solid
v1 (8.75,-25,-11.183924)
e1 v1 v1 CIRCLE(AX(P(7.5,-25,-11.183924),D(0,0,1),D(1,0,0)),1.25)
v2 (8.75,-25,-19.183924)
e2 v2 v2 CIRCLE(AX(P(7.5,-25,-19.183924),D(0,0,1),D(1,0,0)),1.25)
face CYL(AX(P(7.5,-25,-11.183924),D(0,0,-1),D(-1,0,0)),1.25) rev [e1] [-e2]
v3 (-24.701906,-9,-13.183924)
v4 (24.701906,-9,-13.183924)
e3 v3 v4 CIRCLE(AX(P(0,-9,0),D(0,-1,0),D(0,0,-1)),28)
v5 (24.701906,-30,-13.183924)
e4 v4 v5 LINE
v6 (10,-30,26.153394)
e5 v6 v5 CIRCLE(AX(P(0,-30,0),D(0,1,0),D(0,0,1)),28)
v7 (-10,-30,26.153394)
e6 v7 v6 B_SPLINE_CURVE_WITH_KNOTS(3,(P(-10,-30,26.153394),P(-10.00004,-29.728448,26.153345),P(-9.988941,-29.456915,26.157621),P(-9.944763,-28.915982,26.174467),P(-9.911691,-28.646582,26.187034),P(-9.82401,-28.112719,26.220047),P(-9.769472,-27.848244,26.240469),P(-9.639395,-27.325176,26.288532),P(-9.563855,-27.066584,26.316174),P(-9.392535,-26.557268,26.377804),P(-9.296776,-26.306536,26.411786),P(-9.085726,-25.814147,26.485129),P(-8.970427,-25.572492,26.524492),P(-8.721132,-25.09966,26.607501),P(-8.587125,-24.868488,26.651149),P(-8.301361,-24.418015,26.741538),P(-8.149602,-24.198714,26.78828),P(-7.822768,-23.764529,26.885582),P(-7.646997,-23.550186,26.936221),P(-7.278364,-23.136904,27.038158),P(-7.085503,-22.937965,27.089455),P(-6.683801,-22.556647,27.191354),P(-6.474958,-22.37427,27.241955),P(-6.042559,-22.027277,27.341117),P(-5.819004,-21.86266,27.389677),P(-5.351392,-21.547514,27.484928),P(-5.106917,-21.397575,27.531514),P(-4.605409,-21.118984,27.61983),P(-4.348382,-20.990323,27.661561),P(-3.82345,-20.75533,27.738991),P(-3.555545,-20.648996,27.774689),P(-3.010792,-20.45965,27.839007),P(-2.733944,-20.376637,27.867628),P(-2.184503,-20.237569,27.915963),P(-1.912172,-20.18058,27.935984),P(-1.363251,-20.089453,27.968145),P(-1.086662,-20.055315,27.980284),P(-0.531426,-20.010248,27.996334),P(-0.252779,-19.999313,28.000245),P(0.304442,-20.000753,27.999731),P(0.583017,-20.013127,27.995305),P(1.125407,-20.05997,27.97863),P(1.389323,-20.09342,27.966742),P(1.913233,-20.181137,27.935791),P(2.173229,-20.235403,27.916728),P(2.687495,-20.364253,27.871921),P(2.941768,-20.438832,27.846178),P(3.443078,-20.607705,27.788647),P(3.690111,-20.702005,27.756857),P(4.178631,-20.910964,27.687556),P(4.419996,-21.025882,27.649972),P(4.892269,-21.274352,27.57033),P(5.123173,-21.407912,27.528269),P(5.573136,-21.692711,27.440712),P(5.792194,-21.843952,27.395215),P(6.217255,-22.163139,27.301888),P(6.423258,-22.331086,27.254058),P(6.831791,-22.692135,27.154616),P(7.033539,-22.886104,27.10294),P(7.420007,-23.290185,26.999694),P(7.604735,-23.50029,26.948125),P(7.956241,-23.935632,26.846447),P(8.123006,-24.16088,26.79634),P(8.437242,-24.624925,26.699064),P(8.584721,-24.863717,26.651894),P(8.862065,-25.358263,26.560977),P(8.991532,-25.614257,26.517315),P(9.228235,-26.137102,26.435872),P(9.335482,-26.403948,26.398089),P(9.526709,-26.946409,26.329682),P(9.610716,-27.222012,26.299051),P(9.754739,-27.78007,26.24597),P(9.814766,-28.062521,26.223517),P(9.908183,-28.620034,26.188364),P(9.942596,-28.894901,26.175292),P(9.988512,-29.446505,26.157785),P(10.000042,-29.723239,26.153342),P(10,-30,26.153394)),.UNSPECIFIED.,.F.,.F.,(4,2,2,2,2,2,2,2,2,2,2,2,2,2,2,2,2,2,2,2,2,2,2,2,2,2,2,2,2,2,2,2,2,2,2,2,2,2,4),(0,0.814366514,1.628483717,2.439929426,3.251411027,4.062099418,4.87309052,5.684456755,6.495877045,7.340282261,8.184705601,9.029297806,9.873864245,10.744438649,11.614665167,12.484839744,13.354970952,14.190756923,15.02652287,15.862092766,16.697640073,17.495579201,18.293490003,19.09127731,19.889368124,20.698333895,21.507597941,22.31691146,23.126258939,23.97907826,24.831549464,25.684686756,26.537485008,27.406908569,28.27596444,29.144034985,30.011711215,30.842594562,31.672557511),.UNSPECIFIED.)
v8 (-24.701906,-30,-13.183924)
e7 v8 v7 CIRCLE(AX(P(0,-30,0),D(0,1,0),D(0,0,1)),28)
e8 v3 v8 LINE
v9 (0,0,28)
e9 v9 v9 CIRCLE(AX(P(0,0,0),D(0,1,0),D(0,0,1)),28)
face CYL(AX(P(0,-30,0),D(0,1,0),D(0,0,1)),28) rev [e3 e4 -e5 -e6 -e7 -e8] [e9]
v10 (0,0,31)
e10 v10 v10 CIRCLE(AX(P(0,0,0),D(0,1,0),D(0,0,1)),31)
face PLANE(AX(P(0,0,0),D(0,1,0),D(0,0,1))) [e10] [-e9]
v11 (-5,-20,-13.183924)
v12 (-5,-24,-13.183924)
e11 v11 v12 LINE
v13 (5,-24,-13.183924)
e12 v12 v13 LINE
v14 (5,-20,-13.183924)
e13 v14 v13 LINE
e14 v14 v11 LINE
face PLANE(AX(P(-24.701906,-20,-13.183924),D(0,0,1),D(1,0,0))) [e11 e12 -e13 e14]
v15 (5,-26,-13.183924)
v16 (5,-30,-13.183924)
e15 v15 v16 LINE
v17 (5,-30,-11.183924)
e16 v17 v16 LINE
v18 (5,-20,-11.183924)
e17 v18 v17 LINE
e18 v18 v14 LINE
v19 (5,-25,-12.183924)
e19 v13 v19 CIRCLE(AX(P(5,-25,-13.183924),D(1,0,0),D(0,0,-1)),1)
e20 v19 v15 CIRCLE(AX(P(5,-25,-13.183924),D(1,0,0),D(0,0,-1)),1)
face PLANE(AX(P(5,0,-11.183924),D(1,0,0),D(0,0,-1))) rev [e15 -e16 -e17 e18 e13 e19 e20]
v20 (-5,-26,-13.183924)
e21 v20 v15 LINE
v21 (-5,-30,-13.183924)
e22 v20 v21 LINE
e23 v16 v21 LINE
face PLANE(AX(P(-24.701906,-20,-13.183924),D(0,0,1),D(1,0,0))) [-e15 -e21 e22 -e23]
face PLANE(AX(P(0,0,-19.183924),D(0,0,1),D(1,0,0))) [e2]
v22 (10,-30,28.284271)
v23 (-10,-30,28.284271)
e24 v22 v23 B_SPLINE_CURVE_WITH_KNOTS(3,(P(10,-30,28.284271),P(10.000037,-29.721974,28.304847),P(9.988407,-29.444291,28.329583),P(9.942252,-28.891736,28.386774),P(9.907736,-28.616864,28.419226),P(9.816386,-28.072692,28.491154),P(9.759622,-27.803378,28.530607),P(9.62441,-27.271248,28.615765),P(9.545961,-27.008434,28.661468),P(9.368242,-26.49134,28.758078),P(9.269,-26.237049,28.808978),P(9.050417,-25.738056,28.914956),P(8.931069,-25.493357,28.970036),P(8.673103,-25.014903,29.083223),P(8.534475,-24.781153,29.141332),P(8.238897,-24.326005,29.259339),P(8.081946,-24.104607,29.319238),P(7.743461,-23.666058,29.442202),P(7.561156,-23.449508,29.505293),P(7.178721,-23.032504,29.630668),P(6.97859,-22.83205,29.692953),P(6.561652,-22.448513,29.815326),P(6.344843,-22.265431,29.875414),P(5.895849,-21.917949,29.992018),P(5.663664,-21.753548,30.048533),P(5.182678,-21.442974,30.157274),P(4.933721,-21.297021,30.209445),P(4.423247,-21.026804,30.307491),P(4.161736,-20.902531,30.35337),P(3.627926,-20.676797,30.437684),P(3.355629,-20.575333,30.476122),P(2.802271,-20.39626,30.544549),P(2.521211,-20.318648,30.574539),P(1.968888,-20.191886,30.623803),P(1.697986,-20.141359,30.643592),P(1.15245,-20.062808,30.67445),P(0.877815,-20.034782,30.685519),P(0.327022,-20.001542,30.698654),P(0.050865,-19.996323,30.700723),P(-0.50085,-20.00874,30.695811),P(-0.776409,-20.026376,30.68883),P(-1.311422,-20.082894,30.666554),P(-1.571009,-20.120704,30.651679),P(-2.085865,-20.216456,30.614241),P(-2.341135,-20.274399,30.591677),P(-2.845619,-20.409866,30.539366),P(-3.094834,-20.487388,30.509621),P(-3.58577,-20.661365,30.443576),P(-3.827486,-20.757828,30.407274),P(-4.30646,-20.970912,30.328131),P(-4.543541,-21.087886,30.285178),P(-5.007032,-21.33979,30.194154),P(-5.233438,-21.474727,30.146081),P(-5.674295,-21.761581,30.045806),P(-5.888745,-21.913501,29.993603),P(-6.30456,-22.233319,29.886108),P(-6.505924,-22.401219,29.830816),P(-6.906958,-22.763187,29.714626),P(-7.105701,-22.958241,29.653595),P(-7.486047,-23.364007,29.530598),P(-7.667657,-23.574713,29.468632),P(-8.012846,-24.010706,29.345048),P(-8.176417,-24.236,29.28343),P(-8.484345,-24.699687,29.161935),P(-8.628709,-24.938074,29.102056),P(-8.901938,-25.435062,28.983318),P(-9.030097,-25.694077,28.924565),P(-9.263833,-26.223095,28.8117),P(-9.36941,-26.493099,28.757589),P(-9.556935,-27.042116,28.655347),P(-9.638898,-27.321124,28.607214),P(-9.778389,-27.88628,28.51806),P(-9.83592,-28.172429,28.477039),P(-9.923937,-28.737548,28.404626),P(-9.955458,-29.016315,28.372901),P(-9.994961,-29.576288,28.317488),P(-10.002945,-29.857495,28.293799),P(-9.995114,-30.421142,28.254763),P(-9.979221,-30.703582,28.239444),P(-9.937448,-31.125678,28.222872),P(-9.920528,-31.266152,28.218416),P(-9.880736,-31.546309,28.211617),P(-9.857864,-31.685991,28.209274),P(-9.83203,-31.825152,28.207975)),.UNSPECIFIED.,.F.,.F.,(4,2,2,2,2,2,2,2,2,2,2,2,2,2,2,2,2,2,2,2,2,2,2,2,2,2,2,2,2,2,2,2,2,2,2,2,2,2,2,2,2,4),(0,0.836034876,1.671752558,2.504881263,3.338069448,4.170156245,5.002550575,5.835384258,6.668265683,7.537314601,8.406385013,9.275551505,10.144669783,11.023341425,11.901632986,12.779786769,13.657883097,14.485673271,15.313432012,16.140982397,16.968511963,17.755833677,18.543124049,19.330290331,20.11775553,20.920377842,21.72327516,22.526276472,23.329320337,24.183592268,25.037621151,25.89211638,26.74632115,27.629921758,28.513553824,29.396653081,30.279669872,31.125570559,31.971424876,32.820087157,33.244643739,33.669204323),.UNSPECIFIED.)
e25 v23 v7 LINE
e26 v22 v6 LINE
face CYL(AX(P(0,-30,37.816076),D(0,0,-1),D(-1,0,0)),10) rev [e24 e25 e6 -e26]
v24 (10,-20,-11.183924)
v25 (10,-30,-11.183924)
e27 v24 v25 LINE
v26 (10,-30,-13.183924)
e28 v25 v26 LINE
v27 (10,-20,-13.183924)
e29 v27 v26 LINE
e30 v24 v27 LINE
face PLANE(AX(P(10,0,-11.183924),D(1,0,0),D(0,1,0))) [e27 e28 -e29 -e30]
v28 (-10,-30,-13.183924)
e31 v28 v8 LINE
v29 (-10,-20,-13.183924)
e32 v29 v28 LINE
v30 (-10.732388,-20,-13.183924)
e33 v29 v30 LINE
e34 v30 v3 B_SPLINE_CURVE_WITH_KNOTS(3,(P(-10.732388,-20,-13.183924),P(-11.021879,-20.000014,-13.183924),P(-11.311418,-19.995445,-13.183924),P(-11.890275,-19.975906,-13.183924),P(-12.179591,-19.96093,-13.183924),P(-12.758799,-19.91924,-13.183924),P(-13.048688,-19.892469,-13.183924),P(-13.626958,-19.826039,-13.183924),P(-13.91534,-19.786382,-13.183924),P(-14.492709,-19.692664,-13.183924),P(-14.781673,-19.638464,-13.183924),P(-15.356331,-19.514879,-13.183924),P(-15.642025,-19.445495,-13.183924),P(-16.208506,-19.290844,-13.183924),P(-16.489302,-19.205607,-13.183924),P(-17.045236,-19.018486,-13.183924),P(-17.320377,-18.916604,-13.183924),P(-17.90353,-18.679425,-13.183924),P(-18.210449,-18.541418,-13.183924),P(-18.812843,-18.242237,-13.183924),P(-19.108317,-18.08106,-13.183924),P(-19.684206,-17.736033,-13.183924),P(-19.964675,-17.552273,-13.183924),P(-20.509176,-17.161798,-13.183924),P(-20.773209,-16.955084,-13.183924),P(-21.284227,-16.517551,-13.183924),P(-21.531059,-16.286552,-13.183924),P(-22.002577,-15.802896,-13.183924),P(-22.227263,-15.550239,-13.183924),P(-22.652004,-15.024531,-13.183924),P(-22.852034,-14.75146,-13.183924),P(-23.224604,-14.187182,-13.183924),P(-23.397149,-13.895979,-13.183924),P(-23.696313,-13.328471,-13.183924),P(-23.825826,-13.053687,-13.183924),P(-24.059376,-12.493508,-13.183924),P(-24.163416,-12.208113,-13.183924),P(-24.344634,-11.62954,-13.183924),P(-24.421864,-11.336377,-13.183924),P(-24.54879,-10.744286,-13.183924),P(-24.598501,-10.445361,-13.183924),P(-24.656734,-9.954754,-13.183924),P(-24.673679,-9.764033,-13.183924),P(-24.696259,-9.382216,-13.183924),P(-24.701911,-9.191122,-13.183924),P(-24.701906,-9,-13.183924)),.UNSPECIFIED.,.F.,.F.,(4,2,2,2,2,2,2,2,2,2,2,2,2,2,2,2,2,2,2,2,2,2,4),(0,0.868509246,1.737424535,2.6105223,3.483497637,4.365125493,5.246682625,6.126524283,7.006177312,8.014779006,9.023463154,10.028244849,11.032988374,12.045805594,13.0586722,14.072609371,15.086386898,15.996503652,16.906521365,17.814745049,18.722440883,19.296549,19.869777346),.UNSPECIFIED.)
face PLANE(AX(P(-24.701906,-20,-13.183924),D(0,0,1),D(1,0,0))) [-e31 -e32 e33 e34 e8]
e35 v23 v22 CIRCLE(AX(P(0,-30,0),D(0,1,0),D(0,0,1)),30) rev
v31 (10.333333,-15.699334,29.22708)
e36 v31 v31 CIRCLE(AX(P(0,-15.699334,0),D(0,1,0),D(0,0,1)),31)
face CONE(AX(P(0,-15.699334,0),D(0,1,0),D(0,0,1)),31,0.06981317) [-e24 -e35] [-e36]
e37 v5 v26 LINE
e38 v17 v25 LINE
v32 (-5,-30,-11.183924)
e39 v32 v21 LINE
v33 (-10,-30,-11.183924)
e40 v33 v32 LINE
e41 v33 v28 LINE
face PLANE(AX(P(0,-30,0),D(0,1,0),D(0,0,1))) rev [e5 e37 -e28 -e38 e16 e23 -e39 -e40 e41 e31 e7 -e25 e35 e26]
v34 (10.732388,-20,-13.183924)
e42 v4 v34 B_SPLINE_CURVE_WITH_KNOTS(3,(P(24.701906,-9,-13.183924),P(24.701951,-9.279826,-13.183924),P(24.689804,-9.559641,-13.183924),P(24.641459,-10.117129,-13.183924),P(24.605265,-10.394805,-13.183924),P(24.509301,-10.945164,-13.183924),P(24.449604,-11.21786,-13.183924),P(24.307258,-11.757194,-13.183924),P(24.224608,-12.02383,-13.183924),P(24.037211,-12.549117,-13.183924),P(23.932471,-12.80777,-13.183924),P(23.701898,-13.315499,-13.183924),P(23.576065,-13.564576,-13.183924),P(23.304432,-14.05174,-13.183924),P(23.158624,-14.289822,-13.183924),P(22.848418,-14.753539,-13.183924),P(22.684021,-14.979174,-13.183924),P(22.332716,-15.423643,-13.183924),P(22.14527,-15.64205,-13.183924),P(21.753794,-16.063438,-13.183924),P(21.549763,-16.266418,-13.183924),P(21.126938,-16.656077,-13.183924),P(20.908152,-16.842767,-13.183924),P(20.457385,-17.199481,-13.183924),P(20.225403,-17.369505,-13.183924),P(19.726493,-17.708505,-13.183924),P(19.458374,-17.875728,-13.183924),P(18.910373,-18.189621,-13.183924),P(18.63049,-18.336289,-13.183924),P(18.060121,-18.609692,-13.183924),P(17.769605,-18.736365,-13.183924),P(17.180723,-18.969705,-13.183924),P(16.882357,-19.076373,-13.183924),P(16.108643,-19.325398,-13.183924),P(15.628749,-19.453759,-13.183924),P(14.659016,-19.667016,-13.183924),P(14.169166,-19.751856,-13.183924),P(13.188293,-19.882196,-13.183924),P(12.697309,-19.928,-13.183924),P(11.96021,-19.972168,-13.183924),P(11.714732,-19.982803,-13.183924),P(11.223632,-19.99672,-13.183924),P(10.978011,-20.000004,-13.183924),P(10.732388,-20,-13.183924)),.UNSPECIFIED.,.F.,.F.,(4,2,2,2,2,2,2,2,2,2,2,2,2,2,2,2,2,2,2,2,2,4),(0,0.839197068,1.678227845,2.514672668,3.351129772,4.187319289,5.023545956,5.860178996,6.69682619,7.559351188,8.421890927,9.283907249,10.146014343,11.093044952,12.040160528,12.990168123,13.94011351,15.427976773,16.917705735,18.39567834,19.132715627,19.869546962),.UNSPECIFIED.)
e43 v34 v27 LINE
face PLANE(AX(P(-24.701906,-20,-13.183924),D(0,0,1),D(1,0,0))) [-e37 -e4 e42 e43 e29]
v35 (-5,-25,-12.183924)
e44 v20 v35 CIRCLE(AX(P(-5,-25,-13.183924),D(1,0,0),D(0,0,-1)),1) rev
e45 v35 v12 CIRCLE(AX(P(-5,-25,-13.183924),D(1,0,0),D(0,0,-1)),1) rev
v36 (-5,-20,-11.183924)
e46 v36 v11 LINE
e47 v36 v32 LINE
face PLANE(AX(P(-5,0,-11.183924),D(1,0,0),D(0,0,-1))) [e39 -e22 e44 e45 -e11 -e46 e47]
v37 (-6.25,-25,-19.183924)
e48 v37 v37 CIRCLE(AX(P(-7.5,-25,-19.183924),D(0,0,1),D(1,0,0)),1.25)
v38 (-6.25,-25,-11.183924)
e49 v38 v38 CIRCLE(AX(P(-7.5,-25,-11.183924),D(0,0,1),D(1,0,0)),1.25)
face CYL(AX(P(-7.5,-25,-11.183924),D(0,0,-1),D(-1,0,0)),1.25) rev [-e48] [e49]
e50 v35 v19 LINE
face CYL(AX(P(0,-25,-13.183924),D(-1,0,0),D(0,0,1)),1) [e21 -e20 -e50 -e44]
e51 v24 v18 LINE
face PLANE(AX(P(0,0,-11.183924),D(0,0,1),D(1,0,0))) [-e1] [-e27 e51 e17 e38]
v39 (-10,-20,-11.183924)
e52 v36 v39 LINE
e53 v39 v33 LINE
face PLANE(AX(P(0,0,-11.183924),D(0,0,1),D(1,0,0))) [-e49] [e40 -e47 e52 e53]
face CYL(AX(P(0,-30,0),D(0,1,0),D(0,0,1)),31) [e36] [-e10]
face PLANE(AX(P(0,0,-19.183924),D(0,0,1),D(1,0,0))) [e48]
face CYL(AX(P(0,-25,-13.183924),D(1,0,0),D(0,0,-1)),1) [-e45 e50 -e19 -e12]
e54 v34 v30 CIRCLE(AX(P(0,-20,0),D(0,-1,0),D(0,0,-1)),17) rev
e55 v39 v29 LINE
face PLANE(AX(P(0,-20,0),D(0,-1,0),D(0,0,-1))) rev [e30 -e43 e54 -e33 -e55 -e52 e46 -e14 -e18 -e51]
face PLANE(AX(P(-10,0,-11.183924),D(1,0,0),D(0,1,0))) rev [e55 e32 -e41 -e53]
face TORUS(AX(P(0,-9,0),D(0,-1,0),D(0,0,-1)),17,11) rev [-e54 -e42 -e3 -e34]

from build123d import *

# Parameters (mm, degrees)
SKETCH1_R           = 31
SKETCH1_R_2         = 28
BOSS_EXTRUDE1_DEPTH = 30
BOSS_EXTRUDE2_START = -10
BOSS_EXTRUDE2_DEPTH = 10
CUT_EXTRUDE1_DEPTH  = 51
SKETCH4_W           = 5
SKETCH4_H           = 10
SKETCH4_R           = 1.25
BOSS_EXTRUDE3_DEPTH = 2
SKETCH4_3_W         = 10
SKETCH4_3_H         = 2
BOSS_EXTRUDE4_DEPTH = 1
CUT_EXTRUDE2_START  = -6
SKETCH4_4_R         = 1.25
CUT_EXTRUDE2_DEPTH  = 6
FILLET1_R           = 1
FILLET3_R           = 11


with BuildPart() as part:
    # Sketch1 → Boss-Extrude1 (new body)
    with BuildSketch(Plane(origin=(0, 0, 0), x_dir=(1, 0, 0), z_dir=(0, 1, 0))):
        with Locations(Location((0, 0, 0), (0, 0, 270))):
            Circle(SKETCH1_R)
        with Locations(Location((0, 0, 0), (0, 0, 270))):
            Circle(SKETCH1_R_2, mode=Mode.SUBTRACT)
    extrude(amount=-BOSS_EXTRUDE1_DEPTH)

    # Sketch2 → Boss-Extrude2 (add)
    with BuildSketch(Plane.XZ.offset(30).offset(BOSS_EXTRUDE2_START)):
        with BuildLine():
            Line((-24.701905706, -13.183924092), (24.701905706, -13.183924092))
            ThreePointArc((24.701905706, -13.183924092), (0, -28), (-24.701905706, -13.183924092))
        make_face()
    extrude(amount=BOSS_EXTRUDE2_DEPTH)

    # Sketch3 → Cut-Extrude1 (cut)
    with BuildSketch(Plane.XY.offset(-13.183924092)):
        with BuildLine():
            Line((-10, -30), (10, -30))
            ThreePointArc((10, -30), (0, -20), (-10, -30))
        make_face()
    extrude(amount=CUT_EXTRUDE1_DEPTH, mode=Mode.SUBTRACT)

    # Sketch4 → Boss-Extrude3 (add)
    # profile 1 of 2: a face of its own
    with BuildSketch(Plane.XY.offset(-13.183924092)):
        with Locations((-7.5, -25)):
            Rectangle(SKETCH4_W, SKETCH4_H)
        with Locations((-7.5, -25)):
            Circle(SKETCH4_R, mode=Mode.SUBTRACT)
    # profile 2 of 2: a face of its own
    with BuildSketch(Plane.XY.offset(-13.183924092)):
        with Locations((7.5, -25)):
            Rectangle(SKETCH4_W, SKETCH4_H)
        with Locations((7.5, -25)):
            Circle(SKETCH4_R, mode=Mode.SUBTRACT)
    extrude(amount=BOSS_EXTRUDE3_DEPTH)

    # Sketch4<3> → Boss-Extrude4 (add)
    with BuildSketch(Plane.XY.offset(-13.183924092)):
        with Locations((0, -25)):
            Rectangle(SKETCH4_3_W, SKETCH4_3_H)
    extrude(amount=BOSS_EXTRUDE4_DEPTH)

    # Sketch4<4> → Cut-Extrude2 (cut)
    with BuildSketch(Plane.XY.offset(-13.183924092).offset(CUT_EXTRUDE2_START)):
        with Locations((-7.5, -25)):
            Circle(SKETCH4_4_R)
        with Locations((7.5, -25)):
            Circle(SKETCH4_4_R)
    extrude(amount=CUT_EXTRUDE2_DEPTH, mode=Mode.SUBTRACT)

    # Fillet1
    fillet1_edges = [part.edges().sort_by_distance(p)[0] for p in [
        (0, -24, -12.183924092),
        (0, -26, -12.183924092),
    ]]
    fillet(fillet1_edges, radius=FILLET1_R - 0.0001)  # a hair under: the kernel refuses the full size

    # Chamfer1: read off the stored shape, not the designer's step
    # Chamfer1 outline → Chamfer1 (revolve, cut)
    with BuildSketch(Plane.XY):
        Polygon((31, -15.699333743), (30, -30), (31, -30), align=None)
    revolve(axis=Axis((0, 0, 0), (0, 1, 0)), mode=Mode.SUBTRACT)

    # Fillet3
    fillet3_edges = [part.edges().sort_by_distance(p)[0] for p in [
        (0, -20, -28),
    ]]
    fillet(fillet3_edges, radius=FILLET3_R)


solid = part.part
